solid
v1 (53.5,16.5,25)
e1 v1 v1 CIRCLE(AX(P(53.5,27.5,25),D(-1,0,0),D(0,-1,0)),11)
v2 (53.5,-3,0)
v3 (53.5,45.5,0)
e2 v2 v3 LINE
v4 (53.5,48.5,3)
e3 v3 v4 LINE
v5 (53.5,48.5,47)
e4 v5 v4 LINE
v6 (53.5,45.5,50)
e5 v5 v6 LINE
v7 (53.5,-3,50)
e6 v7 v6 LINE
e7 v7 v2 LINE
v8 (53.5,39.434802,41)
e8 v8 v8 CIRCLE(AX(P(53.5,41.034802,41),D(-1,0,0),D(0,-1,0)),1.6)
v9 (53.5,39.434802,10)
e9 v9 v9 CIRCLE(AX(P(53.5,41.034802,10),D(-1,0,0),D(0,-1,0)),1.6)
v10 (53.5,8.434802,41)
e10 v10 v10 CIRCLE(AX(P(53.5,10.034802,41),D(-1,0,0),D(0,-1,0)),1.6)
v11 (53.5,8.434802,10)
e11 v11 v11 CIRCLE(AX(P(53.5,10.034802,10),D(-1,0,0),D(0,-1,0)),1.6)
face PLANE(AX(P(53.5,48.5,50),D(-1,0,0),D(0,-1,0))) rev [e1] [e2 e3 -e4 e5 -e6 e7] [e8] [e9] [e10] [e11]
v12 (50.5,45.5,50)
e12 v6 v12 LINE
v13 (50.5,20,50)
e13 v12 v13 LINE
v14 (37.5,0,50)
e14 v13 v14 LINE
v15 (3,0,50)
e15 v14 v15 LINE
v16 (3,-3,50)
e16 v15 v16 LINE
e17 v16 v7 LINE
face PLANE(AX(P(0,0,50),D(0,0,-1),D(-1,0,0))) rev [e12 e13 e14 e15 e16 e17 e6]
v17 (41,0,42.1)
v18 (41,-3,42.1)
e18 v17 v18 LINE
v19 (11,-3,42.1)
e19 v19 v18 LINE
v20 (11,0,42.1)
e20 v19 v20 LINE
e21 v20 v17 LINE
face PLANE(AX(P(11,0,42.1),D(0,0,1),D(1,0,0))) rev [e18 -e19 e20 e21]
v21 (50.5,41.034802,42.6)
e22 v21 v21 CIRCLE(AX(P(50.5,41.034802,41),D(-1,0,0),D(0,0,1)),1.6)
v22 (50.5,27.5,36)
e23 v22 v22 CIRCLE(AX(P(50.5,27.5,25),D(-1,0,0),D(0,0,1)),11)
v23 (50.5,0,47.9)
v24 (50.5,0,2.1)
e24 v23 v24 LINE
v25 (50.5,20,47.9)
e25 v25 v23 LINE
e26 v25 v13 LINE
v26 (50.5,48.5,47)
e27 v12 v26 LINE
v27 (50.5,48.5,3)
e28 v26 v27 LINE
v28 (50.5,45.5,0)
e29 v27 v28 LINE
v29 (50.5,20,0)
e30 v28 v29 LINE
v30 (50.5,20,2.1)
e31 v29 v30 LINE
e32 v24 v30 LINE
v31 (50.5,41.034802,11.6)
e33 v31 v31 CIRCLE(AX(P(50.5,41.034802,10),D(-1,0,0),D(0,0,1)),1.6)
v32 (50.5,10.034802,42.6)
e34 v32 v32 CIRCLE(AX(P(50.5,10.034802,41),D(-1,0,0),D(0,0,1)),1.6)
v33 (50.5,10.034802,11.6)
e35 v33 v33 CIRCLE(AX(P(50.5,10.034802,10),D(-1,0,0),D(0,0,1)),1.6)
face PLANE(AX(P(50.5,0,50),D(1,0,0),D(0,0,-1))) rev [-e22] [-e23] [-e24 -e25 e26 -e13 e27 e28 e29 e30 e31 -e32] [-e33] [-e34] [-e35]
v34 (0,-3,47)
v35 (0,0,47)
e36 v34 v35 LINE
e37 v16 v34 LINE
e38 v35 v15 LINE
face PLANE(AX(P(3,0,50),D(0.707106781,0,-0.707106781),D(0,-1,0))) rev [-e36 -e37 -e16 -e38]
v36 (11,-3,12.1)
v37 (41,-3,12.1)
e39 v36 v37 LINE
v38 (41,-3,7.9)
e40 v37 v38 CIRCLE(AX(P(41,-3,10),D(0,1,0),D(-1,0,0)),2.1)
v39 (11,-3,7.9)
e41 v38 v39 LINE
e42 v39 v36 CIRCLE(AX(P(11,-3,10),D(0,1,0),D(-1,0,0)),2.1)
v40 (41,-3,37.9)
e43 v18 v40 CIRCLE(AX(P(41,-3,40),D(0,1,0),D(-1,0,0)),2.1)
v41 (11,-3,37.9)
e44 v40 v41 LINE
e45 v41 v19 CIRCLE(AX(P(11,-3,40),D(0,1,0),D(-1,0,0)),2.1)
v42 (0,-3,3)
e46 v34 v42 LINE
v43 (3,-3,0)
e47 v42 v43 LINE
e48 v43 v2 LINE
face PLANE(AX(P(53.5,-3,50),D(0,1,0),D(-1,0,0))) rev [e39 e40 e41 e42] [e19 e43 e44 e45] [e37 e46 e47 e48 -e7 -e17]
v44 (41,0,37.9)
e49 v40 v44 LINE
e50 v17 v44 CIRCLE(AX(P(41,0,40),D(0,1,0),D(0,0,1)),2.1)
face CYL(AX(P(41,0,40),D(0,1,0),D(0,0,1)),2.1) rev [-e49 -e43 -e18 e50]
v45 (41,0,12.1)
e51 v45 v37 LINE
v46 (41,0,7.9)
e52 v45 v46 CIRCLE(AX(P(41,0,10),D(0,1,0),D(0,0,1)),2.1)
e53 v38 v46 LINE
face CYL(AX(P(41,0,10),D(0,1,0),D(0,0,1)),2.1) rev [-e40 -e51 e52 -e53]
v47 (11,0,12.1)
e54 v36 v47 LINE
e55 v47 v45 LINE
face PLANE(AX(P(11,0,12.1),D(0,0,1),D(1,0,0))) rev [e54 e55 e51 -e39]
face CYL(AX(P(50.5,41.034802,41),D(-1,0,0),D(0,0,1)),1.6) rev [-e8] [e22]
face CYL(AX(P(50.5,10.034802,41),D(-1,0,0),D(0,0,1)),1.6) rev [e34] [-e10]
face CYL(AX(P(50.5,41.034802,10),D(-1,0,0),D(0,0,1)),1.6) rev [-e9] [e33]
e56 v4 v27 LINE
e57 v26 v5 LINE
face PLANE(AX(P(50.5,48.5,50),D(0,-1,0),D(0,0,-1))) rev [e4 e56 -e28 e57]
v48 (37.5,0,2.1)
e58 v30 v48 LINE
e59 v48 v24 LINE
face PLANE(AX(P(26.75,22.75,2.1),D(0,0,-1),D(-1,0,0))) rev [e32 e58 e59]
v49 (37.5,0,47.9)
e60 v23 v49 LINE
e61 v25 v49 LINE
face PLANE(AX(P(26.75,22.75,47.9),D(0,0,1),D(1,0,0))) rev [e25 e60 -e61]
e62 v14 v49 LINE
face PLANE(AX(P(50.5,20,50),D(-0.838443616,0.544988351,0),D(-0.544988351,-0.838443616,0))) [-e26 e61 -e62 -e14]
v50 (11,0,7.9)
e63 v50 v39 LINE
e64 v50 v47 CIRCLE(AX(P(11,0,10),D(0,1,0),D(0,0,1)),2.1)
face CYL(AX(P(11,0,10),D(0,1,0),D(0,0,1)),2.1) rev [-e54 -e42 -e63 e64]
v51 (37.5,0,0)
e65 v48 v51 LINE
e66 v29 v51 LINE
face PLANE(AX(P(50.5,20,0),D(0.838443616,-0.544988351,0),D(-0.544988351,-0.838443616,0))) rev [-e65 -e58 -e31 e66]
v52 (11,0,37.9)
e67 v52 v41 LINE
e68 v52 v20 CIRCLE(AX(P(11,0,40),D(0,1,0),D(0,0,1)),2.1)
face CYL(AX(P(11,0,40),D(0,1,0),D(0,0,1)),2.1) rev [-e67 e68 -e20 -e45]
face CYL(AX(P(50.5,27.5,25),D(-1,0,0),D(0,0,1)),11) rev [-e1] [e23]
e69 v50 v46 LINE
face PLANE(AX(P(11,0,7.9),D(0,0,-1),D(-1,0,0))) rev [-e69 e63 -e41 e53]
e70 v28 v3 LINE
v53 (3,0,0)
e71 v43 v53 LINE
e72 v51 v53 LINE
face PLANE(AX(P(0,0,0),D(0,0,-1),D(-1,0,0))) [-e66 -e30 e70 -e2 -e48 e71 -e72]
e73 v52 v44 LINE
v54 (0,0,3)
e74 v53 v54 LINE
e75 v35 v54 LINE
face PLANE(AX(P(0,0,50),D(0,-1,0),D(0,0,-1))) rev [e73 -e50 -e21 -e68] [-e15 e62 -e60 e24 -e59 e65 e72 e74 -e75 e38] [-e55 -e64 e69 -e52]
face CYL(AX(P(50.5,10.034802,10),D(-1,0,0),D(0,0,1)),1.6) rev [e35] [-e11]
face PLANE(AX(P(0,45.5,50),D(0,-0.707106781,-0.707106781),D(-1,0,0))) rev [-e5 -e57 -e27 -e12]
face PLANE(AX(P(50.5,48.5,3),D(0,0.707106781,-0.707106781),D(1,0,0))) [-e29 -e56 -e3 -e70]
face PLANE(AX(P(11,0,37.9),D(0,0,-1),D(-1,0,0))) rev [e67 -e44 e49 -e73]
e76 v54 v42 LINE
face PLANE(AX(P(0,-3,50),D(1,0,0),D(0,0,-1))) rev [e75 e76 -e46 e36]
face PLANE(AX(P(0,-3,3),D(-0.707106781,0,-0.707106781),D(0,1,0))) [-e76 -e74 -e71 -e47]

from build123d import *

# Parameters (mm, degrees)
EXTRUDE_1_DEPTH             = 50
HOLE_WIZARD_1_D             = 22
HOLE_WIZARD_1_DEPTH         = 100
HOLE_WIZARD_2_D             = 3.2
HOLE_WIZARD_2_DEPTH         = 100
HOLE_START                  = -3
HOLE_WIZARD_4_2_4_2_1_DEPTH = 3
RIB_1_REACH                 = 89.832
SKETCH_13_WALL_W            = 201.518173748
SKETCH_13_WALL_H            = 2.1
CHAMFER_1_SIZE              = 3


# Read off the part's stored shape, not the designer's step: Ø4.2 (4.2) 直径槽口1
with BuildPart() as part:
    # 草图1 → 凸台-拉伸1 (new body)
    with BuildSketch(Plane.XY):
        Polygon((0, 0), (50.5, 0), (50.5, 48.5), (53.5, 48.5), (53.5, -3), (0, -3), align=None)
    extrude(amount=EXTRUDE_1_DEPTH)

    # 孔1
    with Locations(Plane.ZY.offset(-50.5)):
        with Locations((25, 27.5)):
            Hole(HOLE_WIZARD_1_D / 2, depth=HOLE_WIZARD_1_DEPTH)

    # 孔2
    with Locations(Plane.ZY.offset(-50.5)):
        with Locations((10, 41.034802043), (41, 41.034802043), (41, 10.034802043), (10, 10.034802043)):
            Hole(HOLE_WIZARD_2_D / 2, depth=HOLE_WIZARD_2_DEPTH)

    # Ø4.2 (4.2) 直径槽口1 outline → Ø4.2 (4.2) 直径槽口1 (cut)
    with BuildSketch(Plane(origin=(0, 0, 0), x_dir=(1, 0, 0), z_dir=(0, 1, 0)).offset(HOLE_START)):
        with BuildLine():
            Line((11, -42.1), (41, -42.1))
            ThreePointArc((41, -42.1), (43.1, -40), (41, -37.9))
            Line((41, -37.9), (11, -37.9))
            ThreePointArc((11, -37.9), (8.9, -40), (11, -42.1))
        make_face()
        with BuildLine():
            Line((11, -12.1), (41, -12.1))
            ThreePointArc((41, -12.1), (43.1, -10), (41, -7.9))
            Line((41, -7.9), (11, -7.9))
            ThreePointArc((11, -7.9), (8.9, -10), (11, -12.1))
        make_face()
    extrude(amount=HOLE_WIZARD_4_2_4_2_1_DEPTH, mode=Mode.SUBTRACT)

    # 草图13 wall → 筋1 (add, up to next)
    with BuildSketch(Plane(origin=(44, 10, 50), x_dir=(-0.544988350595, -0.838443616301, 0), z_dir=(0.838443616301, -0.544988350595, 0)), mode=Mode.PRIVATE) as rib_1_sk1:
        with Locations((0, 1.05)):
            Rectangle(SKETCH_13_WALL_W, SKETCH_13_WALL_H)
    rib_1_tool1 = extrude(rib_1_sk1.sketch, amount=RIB_1_REACH, mode=Mode.PRIVATE) - part.part
    rib_1 = rib_1_tool1.solids().sort_by_distance((44, 10, 50))[0]
    add(rib_1)

    # 镜向1: 筋1 across plane
    add(rib_1.mirror(Plane.XY.offset(25)))

    # 倒角1
    chamfer_1_edges = [part.edges().sort_by_distance(p)[0] for p in [
        (52, 48.5, 50),
        (0, -1.5, 50),
        (52, 48.5, 0),
        (0, -1.5, 0),
    ]]
    chamfer(chamfer_1_edges, length=CHAMFER_1_SIZE)


solid = part.part
